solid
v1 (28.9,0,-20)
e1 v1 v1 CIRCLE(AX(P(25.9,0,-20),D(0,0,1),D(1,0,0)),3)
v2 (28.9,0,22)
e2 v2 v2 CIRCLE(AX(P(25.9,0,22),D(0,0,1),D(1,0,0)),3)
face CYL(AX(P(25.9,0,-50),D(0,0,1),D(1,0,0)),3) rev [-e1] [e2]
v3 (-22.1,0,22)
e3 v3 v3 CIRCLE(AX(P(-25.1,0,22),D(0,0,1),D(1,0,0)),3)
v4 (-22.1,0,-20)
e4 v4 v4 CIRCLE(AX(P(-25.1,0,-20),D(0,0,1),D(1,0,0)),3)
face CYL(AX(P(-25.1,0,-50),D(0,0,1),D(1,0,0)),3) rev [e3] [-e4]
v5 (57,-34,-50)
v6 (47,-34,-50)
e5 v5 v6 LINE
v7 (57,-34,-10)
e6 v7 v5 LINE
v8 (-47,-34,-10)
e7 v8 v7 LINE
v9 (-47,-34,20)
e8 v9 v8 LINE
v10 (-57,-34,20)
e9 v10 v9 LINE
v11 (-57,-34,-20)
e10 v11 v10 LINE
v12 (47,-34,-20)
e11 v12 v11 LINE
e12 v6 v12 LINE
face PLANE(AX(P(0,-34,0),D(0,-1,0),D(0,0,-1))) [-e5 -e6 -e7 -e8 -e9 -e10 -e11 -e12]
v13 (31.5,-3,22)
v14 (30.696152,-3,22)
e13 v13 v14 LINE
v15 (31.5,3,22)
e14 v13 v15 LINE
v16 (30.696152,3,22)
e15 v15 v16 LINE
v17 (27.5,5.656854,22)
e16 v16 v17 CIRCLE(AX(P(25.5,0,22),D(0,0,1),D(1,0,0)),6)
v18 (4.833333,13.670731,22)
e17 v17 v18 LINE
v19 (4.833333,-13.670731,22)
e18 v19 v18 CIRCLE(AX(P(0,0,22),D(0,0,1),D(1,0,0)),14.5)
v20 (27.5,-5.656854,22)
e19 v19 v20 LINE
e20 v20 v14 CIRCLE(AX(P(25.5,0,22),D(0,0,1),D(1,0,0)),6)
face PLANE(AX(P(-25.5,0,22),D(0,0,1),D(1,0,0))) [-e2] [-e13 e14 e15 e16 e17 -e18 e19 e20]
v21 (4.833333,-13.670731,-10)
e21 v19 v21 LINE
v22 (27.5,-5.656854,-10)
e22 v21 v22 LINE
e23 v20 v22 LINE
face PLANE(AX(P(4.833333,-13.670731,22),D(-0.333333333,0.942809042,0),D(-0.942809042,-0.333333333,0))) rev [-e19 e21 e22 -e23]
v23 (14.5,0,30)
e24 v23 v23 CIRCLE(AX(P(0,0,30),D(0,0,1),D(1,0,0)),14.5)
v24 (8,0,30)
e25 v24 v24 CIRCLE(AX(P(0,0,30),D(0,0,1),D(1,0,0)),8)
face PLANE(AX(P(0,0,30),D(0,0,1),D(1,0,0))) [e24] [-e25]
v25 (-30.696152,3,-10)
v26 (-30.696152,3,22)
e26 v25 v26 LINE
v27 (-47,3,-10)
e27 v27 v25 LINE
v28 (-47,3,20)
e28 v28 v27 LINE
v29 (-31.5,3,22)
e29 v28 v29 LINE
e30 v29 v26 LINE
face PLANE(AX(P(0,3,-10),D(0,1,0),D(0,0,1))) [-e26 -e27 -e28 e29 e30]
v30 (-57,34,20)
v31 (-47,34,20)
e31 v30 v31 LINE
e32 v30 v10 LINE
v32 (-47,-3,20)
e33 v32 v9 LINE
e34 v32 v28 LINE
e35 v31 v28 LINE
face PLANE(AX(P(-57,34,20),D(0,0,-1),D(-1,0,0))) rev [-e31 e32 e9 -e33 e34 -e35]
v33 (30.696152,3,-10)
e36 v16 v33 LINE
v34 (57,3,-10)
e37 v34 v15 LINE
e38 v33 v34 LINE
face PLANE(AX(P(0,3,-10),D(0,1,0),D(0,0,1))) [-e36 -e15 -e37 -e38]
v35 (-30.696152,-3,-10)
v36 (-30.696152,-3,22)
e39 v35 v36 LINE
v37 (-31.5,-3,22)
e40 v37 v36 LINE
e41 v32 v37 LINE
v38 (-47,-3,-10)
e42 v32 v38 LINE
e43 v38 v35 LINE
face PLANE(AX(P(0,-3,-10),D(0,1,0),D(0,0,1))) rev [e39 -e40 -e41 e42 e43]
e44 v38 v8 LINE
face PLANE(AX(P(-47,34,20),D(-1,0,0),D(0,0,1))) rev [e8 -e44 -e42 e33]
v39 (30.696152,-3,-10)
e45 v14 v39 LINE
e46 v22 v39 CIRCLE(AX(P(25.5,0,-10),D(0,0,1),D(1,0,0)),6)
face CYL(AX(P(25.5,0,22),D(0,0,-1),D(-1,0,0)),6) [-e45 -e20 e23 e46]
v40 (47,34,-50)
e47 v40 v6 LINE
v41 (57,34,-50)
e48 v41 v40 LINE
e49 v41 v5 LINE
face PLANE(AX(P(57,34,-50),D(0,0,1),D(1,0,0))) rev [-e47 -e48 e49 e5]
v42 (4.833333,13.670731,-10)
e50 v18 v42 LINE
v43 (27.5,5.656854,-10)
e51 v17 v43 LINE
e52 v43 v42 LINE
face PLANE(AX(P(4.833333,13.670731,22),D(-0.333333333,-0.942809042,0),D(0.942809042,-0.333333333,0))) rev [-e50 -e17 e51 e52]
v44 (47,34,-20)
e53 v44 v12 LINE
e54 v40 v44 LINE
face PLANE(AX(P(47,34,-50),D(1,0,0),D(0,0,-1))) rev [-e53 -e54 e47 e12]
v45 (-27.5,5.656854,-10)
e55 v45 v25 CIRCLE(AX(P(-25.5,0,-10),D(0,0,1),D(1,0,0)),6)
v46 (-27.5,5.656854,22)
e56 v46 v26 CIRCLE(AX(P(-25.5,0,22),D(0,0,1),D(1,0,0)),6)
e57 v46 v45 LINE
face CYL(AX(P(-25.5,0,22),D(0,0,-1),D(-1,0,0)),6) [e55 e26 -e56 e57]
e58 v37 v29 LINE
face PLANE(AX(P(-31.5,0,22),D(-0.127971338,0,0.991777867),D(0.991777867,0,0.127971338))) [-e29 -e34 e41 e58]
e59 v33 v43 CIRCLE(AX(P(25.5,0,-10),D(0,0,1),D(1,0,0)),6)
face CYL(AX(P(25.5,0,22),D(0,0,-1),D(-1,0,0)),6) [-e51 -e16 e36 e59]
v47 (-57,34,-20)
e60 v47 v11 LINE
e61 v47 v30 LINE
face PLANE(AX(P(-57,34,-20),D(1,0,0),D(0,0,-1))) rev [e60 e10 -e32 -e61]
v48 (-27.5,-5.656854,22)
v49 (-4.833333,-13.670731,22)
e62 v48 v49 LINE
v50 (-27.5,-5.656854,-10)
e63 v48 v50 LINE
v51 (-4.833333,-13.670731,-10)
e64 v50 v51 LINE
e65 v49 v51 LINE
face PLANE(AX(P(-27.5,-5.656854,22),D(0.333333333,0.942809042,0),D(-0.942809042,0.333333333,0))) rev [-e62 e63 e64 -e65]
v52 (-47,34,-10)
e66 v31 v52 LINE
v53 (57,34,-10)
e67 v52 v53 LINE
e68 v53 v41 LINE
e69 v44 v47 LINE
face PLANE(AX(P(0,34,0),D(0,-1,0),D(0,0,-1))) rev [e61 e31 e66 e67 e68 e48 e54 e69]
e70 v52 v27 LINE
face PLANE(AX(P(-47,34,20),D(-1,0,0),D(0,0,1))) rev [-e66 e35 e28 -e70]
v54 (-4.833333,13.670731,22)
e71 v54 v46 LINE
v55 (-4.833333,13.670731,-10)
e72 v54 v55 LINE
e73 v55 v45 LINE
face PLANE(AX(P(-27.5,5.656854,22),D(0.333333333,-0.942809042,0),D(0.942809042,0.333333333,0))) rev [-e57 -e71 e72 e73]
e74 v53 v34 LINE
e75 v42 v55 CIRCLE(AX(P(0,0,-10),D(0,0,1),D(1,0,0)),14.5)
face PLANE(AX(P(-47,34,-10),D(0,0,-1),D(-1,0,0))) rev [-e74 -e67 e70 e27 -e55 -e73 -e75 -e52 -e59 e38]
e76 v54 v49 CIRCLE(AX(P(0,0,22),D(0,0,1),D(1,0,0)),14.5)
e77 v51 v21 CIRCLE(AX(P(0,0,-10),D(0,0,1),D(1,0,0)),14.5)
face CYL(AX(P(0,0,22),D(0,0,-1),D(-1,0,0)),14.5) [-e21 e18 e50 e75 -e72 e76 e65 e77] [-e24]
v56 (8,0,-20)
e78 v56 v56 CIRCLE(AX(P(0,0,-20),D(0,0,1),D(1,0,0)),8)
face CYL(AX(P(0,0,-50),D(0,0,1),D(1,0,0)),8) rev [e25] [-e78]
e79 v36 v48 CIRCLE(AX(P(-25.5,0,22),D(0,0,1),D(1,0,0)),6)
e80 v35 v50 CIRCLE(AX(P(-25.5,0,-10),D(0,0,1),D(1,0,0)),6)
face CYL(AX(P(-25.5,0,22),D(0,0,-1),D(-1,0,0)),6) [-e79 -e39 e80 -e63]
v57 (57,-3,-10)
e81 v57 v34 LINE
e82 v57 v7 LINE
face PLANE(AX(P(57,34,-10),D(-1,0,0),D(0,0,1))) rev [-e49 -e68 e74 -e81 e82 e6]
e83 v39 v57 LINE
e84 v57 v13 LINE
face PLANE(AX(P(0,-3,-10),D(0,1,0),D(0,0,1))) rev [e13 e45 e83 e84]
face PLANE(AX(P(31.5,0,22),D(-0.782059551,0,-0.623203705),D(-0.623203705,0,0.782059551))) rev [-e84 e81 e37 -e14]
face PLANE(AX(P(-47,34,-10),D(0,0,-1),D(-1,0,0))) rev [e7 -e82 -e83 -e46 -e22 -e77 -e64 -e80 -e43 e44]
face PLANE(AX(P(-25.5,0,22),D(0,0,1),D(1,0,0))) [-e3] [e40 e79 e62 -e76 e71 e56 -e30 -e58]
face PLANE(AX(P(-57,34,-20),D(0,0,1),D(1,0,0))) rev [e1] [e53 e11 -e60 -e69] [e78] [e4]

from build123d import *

# Parameters (mm, degrees)
ESTRUSIONE_ESTRUSIONE5_DEPTH = 34
ESTRUSIONE_ESTRUSIONE6_DEPTH = 32
SCHIZZO9_R                   = 14.5
ESTRUSIONE_ESTRUSIONE7_DEPTH = 8
SCHIZZO10_R                  = 8
TAGLIO_ESTRUSIONE1_DEPTH     = 104.947101932
SCHIZZO11_R                  = 3
TAGLIO_ESTRUSIONE2_DEPTH     = 98.923439482
NERVATURA1_START             = -3
NERVATURA1_DEPTH             = 6
NERVATURA11_START            = -3
NERVATURA11_DEPTH            = 6


with BuildPart() as part:
    # Schizzo7 → Estrusione-Estrusione5 (new, symmetric)
    with BuildSketch(Plane(origin=(0, 0, 0), x_dir=(1, 0, 0), z_dir=(0, 1, 0))):
        Polygon((-57, 20), (-57, -20), (-47, -20), (-47, 10), (57, 10), (57, 50), (47, 50), (47, 20), align=None)
    extrude(amount=ESTRUSIONE_ESTRUSIONE5_DEPTH, both=True)

    # Schizzo8 → Estrusione-Estrusione6 (add)
    with BuildSketch(Plane.XY.offset(-10)):
        with BuildLine():
            Line((-27.5, 5.656854249), (-4.833333333, 13.670731103))
            ThreePointArc((-4.833333333, 13.670731103), (0, 14.5), (4.833333333, 13.670731103))
            Line((4.833333333, 13.670731103), (27.5, 5.656854249))
            ThreePointArc((27.5, 5.656854249), (31.5, 0), (27.5, -5.656854249))
            Line((27.5, -5.656854249), (4.833333333, -13.670731103))
            ThreePointArc((4.833333333, -13.670731103), (0, -14.5), (-4.833333333, -13.670731103))
            Line((-4.833333333, -13.670731103), (-27.5, -5.656854249))
            ThreePointArc((-27.5, -5.656854249), (-31.5, 0), (-27.5, 5.656854249))
        make_face()
    extrude(amount=ESTRUSIONE_ESTRUSIONE6_DEPTH)

    # Schizzo9 → Estrusione-Estrusione7 (add)
    with BuildSketch(Plane.XY.offset(22)):
        with Locations(Location((0, 0, 0), (0, 0, 109.471220634))):
            Circle(SCHIZZO9_R)
    extrude(amount=ESTRUSIONE_ESTRUSIONE7_DEPTH)

    # Schizzo10 → Taglio-Estrusione1 (cut, through all)
    with BuildSketch(Plane.XY.offset(30)):
        Circle(SCHIZZO10_R)
    extrude(amount=-TAGLIO_ESTRUSIONE1_DEPTH, mode=Mode.SUBTRACT)

    # Schizzo11 → Taglio-Estrusione2 (cut, through all)
    with BuildSketch(Plane.XY.offset(22)):
        with Locations((-25.1, 0)):
            Circle(SCHIZZO11_R)
        with Locations((25.9, 0)):
            Circle(SCHIZZO11_R)
    extrude(amount=-TAGLIO_ESTRUSIONE2_DEPTH, mode=Mode.SUBTRACT)

    # Nervatura1: read off the stored shape, not the designer's step
    # Nervatura1 outline → Nervatura1 (add)
    with BuildSketch(Plane(origin=(0, 0, 0), x_dir=(1, 0, 0), z_dir=(0, 1, 0)).offset(NERVATURA1_START)):
        Polygon((31.5, -22), (57, 10), (30.696152423, 10), (30.696152423, -22), align=None)
    extrude(amount=NERVATURA1_DEPTH)

    # Nervatura11: read off the stored shape, not the designer's step
    # Nervatura11 outline → Nervatura11 (add)
    with BuildSketch(Plane(origin=(0, 0, 0), x_dir=(1, 0, 0), z_dir=(0, 1, 0)).offset(NERVATURA11_START)):
        Polygon((-30.696152423, 10), (-47, 10), (-47, -20), (-31.5, -22), (-30.696152423, -22), align=None)
    extrude(amount=NERVATURA11_DEPTH)


solid = part.part
